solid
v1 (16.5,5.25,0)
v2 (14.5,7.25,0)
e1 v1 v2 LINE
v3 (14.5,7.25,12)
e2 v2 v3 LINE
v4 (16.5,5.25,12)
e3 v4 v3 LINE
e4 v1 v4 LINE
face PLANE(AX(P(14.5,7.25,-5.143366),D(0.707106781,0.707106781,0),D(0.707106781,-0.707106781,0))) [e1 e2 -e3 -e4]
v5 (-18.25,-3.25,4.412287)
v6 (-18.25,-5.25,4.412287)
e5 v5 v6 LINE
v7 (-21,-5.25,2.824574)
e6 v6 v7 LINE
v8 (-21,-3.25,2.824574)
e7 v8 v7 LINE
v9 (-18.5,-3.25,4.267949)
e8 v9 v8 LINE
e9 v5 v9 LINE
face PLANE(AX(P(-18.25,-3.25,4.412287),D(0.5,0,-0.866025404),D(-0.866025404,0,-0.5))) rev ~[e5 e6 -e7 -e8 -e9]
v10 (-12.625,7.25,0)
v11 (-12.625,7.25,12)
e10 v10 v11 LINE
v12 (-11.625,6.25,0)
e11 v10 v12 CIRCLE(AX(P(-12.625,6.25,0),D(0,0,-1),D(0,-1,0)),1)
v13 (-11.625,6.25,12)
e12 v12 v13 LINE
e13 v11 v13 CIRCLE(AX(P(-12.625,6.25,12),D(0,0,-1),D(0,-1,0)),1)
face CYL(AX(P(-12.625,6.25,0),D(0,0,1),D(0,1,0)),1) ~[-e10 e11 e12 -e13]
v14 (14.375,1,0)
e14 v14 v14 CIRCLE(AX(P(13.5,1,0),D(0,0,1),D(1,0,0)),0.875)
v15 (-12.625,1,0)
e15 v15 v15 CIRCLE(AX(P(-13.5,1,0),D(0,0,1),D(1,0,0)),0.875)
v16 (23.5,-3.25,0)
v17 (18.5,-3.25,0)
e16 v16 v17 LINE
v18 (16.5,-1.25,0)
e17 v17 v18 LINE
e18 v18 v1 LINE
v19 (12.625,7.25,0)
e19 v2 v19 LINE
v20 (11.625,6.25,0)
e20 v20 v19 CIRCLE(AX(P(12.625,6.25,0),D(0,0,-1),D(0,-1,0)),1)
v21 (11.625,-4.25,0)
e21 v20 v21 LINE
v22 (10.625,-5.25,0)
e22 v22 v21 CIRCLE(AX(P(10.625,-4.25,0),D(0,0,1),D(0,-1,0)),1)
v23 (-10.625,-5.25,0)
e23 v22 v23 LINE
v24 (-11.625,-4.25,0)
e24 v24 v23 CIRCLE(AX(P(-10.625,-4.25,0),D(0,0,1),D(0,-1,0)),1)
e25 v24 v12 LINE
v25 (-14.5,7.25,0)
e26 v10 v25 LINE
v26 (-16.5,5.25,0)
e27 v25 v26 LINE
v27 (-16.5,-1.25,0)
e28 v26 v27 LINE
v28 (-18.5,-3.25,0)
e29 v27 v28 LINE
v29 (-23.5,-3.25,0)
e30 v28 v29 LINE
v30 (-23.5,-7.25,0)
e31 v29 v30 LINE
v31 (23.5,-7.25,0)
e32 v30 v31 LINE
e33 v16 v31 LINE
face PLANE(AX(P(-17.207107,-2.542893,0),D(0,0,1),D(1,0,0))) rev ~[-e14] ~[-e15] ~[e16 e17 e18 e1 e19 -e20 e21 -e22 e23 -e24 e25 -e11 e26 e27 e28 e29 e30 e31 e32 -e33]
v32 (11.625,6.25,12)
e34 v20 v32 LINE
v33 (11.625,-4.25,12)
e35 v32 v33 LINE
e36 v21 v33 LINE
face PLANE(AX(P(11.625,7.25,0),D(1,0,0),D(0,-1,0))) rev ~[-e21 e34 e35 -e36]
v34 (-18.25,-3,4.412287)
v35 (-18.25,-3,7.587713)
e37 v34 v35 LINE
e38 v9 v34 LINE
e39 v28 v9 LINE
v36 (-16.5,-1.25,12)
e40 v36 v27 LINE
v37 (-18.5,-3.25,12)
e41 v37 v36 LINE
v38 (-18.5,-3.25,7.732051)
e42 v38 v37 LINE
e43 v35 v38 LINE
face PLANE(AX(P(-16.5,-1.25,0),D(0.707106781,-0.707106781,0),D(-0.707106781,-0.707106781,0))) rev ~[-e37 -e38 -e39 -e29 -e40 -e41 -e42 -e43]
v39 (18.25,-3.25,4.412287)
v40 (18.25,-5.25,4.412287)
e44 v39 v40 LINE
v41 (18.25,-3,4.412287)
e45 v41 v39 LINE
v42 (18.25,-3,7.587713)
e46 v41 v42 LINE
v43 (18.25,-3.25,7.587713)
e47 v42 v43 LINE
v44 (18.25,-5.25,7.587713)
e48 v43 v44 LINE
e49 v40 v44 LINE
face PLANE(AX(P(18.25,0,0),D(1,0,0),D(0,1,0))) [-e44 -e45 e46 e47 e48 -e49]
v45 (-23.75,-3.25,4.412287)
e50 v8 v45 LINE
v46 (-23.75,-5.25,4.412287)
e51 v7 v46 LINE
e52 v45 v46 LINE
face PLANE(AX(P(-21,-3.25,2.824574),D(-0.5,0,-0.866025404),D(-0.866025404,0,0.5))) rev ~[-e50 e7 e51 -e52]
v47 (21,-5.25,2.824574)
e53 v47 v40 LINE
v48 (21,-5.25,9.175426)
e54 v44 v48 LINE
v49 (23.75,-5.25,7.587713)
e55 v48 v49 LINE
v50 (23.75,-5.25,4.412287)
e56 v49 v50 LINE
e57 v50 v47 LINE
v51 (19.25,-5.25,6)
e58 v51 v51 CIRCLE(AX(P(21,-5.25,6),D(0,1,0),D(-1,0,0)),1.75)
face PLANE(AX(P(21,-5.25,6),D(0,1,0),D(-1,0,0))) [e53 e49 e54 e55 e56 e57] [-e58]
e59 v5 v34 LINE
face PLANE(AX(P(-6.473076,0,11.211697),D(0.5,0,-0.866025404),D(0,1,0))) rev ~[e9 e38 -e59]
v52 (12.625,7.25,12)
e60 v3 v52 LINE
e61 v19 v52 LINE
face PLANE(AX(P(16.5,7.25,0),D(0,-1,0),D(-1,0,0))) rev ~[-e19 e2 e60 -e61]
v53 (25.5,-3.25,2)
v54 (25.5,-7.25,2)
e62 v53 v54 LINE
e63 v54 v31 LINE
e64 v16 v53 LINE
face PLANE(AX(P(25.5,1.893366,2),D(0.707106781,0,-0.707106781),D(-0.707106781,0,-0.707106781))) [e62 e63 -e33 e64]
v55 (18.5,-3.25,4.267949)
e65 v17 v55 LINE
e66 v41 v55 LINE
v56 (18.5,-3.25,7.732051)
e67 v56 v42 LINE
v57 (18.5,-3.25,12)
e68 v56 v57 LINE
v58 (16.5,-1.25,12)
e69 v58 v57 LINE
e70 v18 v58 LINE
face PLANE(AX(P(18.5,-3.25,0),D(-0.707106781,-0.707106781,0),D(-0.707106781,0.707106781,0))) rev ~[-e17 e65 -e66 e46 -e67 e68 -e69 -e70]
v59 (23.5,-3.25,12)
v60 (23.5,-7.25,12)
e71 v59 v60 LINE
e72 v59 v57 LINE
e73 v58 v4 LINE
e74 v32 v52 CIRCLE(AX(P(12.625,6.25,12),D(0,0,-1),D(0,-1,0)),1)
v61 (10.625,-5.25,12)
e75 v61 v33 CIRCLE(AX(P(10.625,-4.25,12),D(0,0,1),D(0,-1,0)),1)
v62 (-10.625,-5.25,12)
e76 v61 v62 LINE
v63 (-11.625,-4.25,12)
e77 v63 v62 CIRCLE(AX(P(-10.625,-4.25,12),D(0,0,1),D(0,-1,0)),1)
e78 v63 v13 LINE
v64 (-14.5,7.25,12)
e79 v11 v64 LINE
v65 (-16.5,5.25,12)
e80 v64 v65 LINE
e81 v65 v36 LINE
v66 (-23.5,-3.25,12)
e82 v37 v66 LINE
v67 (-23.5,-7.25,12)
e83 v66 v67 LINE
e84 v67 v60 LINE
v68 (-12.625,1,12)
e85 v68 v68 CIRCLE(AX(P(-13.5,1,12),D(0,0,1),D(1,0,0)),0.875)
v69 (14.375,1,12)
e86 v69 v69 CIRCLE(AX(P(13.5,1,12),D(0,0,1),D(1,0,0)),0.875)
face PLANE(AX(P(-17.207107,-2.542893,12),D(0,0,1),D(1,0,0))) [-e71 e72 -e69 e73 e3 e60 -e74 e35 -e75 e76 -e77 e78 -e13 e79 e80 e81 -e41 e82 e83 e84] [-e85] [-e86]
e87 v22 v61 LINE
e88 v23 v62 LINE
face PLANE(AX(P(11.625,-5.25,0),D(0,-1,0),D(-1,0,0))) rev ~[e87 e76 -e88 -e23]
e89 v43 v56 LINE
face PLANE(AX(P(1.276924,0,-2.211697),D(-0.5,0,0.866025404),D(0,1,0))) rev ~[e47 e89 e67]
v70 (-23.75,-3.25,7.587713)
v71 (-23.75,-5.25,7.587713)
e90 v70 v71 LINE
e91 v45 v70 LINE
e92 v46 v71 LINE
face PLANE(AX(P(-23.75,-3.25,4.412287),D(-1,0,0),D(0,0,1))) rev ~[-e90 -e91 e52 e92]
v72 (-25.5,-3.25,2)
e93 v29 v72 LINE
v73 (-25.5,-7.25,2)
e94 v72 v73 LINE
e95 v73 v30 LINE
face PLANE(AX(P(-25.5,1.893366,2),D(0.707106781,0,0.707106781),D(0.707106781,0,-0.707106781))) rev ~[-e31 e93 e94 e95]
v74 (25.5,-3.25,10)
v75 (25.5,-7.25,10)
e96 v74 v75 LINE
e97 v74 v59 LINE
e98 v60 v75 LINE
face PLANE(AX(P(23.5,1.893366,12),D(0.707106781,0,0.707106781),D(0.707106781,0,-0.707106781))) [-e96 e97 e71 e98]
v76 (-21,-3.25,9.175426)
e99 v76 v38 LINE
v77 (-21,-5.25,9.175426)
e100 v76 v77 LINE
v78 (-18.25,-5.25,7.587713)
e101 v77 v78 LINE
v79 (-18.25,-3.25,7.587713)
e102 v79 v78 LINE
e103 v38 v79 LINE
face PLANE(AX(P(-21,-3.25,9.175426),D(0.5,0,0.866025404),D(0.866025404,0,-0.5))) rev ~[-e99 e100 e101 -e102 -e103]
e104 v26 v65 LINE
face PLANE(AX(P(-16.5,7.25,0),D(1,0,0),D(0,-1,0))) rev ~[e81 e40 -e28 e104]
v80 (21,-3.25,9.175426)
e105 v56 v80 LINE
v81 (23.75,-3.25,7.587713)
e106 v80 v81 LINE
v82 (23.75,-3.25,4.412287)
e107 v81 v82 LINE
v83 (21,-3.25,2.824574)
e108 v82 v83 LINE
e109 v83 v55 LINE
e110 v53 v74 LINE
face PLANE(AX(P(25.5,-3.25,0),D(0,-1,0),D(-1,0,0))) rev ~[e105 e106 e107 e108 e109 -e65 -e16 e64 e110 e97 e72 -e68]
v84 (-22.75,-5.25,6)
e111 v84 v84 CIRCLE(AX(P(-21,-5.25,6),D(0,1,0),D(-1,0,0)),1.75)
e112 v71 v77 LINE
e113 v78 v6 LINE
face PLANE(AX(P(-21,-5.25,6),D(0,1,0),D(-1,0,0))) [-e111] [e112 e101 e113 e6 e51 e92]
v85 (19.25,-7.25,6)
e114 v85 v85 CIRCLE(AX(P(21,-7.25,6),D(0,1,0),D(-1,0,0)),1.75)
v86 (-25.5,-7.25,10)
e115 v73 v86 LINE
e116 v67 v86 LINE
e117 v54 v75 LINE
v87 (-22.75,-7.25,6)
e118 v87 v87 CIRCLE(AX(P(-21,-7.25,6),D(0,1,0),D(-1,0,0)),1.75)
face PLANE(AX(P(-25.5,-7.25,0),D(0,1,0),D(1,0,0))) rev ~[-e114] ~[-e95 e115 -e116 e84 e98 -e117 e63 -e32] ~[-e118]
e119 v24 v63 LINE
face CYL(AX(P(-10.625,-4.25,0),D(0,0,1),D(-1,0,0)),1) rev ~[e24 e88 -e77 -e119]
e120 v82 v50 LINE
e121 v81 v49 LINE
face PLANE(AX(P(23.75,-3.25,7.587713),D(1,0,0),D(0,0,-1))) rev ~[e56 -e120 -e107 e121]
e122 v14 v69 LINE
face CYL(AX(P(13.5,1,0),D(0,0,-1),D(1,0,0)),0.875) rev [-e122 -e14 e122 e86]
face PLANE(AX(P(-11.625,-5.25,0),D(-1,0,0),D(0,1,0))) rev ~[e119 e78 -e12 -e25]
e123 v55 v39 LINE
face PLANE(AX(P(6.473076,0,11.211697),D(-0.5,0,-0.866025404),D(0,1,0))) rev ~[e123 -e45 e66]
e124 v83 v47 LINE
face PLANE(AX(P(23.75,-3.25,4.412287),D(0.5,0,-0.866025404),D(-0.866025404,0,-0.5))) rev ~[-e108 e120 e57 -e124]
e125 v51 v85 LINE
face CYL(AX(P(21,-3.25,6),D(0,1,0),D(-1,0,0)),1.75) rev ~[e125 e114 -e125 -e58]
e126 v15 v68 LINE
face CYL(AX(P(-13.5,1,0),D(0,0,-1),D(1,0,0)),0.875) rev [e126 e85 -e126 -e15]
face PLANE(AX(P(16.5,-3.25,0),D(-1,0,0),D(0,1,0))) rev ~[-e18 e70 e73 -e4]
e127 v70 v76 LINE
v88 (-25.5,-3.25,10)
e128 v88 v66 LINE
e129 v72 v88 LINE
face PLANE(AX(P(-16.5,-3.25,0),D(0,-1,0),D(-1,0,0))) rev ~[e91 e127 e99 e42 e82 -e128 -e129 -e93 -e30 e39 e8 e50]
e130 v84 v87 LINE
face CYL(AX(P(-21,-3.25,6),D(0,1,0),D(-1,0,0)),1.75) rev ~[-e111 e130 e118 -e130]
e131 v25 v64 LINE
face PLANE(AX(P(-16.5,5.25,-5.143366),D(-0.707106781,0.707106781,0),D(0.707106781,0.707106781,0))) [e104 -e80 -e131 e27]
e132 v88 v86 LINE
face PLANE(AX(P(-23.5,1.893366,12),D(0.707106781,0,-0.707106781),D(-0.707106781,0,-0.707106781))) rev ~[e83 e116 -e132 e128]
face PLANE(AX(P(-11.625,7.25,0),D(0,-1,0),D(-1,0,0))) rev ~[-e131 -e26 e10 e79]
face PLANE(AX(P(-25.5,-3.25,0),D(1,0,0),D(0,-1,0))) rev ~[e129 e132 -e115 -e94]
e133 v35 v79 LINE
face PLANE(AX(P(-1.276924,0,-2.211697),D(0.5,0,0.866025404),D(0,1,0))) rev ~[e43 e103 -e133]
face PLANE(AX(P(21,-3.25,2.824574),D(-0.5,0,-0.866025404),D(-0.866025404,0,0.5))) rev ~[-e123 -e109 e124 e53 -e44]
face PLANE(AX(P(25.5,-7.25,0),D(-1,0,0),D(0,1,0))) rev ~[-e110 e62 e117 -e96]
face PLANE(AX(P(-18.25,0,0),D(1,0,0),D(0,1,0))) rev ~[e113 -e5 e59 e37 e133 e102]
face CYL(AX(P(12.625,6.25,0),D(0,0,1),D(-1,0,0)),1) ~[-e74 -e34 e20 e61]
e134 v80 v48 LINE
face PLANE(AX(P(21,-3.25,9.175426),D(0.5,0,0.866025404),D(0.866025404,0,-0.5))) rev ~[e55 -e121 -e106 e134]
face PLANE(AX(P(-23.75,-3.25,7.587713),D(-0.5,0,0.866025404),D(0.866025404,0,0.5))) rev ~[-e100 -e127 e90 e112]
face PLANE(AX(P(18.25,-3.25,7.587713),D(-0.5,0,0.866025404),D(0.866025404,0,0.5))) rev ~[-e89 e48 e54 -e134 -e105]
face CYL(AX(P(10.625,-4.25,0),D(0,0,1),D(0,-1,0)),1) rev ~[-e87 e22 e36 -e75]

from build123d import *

# Parameters (mm, degrees)
F0_R         = 0.875
F1_DEPTH     = 12
F2_R         = 1.75
F3_DEPTH     = 4.001
F4_DEPTH     = 2
F5_T4_DEPTH  = 12
F5_T10_DEPTH = 12
F5_T16_DEPTH = 12
F5_T23_DEPTH = 12
F5_T29_DEPTH = 12
F5_T35_DEPTH = 12
F5_T41_DEPTH = 12
F5_T47_DEPTH = 12
F5_T54_DEPTH = 12
F5_T60_DEPTH = 12
F5_T63_DEPTH = 14.2867319519
F5_T65_DEPTH = 22.2867319519
F6_R         = 1


# Not quite as in the source:
# - a fillet or chamfer that OpenCascade refuses, or shapes differently, is made with other operations: its cross-section is extruded or revolved along the edge and cut away or added


with BuildPart() as f1:
    # F0 (on Top) → F1 (new body)
    with BuildSketch(Plane.XY):
        Polygon((16.5, -5.25), (11.625, -5.25), (-11.625, -5.25), (-16.5, -5.25), (-16.5, -7.25), (16.5, -7.25), align=None)
        Polygon((-11.625, -5.25), (-11.625, 7.25), (-16.5, 7.25), (-16.5, -3.25), (-16.5, -5.25), align=None)
        with Locations((-13.5, 1)):
            Circle(F0_R, mode=Mode.SUBTRACT)
        Polygon((16.5, -3.25), (16.5, 7.25), (11.625, 7.25), (11.625, -5.25), (16.5, -5.25), align=None)
        with Locations((13.5, 1)):
            Circle(F0_R, mode=Mode.SUBTRACT)
        Polygon((25.5, -3.25), (16.5, -3.25), (16.5, -5.25), (16.5, -7.25), (25.5, -7.25), align=None)
        Polygon((-16.5, -5.25), (-16.5, -3.25), (-25.5, -3.25), (-25.5, -7.25), (-16.5, -7.25), align=None)
    extrude(amount=F1_DEPTH)

    # F2 (on face) → F3 (cut, through all)
    with BuildSketch(Plane(origin=(0, -3.25, 0), x_dir=(-1, 0, 0), z_dir=(0, 1, 0))):
        with Locations((-21, 6)):
            Circle(F2_R)
        with Locations((21, 6)):
            Circle(F2_R)
    extrude(amount=-F3_DEPTH, mode=Mode.SUBTRACT)

    # F2 (on face) → F4 (cut)
    with BuildSketch(Plane(origin=(0, -3.25, 0), x_dir=(-1, 0, 0), z_dir=(0, 1, 0))):
        Polygon((-18.25, 4.4122867597), (-18.25, 7.5877132403), (-21, 9.1754264805), (-23.75, 7.5877132403), (-23.75, 4.4122867597), (-21, 2.8245735195), align=None)
        with Locations((-21, 6)):
            Circle(F2_R, mode=Mode.SUBTRACT)
        Polygon((21, 9.1754264805), (18.25, 7.5877132403), (18.25, 4.4122867597), (21, 2.8245735195), (23.75, 4.4122867597), (23.75, 7.5877132403), align=None)
        with Locations((21, 6)):
            Circle(F2_R, mode=Mode.SUBTRACT)
    extrude(amount=-F4_DEPTH, mode=Mode.SUBTRACT)

    # F5: chamfer of 2 on 8 edges, made by hand


with BuildPart() as f5_tool2:
    # F5_s3 → F5_t4 (new body)
    with BuildSketch(Plane.XY):
        Polygon((18.5, -3.25), (16.5, -1.25), (16.5, -3.25), align=None)
    extrude(amount=F5_T4_DEPTH)

    split(bisect_by=Plane.YZ.offset(18.25), keep=Keep.TOP)

    split(bisect_by=Plane(origin=(6.4730762114, 0, 11.2116968793), x_dir=(0, 1, 0), z_dir=(-0.5, 0, -0.8660254038)), keep=Keep.TOP)


with BuildPart() as f1_1:
    add(f1.part)

    # F5_t1: union F5_tool2
    add(f5_tool2.part)


with BuildPart() as f5_tool8:
    # F5_s9 → F5_t10 (new body)
    with BuildSketch(Plane.XY):
        Polygon((18.5, -3.25), (16.5, -1.25), (16.5, -3.25), align=None)
    extrude(amount=F5_T10_DEPTH)

    split(bisect_by=Plane.YZ.offset(18.25), keep=Keep.BOTTOM)

    split(bisect_by=Plane(origin=(6.4730762114, 0, 11.2116968793), x_dir=(0, 1, 0), z_dir=(-0.5, 0, -0.8660254038)), keep=Keep.TOP)


with BuildPart() as f1_2:
    add(f1_1.part)

    # F5_t7: union F5_tool8
    add(f5_tool8.part)


with BuildPart() as f5_tool14:
    # F5_s15 → F5_t16 (new body)
    with BuildSketch(Plane.XY):
        Polygon((18.5, -3.25), (16.5, -1.25), (16.5, -3.25), align=None)
    extrude(amount=F5_T16_DEPTH)

    split(bisect_by=Plane(origin=(1.2769237886, 0, -2.2116968793), x_dir=(0, 1, 0), z_dir=(0.5, 0, -0.8660254038)), keep=Keep.TOP)

    split(bisect_by=Plane.YZ.offset(18.25), keep=Keep.BOTTOM)

    split(bisect_by=Plane(origin=(6.4730762114, 0, 11.2116968793), x_dir=(0, 1, 0), z_dir=(0.5, 0, 0.8660254038)), keep=Keep.TOP)


with BuildPart() as f1_3:
    add(f1_2.part)

    # F5_t13: union F5_tool14
    add(f5_tool14.part)


with BuildPart() as f5_tool21:
    # F5_s22 → F5_t23 (new body)
    with BuildSketch(Plane.XY):
        Polygon((18.5, -3.25), (16.5, -1.25), (16.5, -3.25), align=None)
    extrude(amount=F5_T23_DEPTH)

    split(bisect_by=Plane(origin=(1.2769237886, 0, -2.2116968793), x_dir=(0, 1, 0), z_dir=(-0.5, 0, 0.8660254038)), keep=Keep.TOP)

    split(bisect_by=Plane.YZ.offset(18.25), keep=Keep.TOP)


with BuildPart() as f1_4:
    add(f1_3.part)

    # F5_t20: union F5_tool21
    add(f5_tool21.part)


with BuildPart() as f5_tool27:
    # F5_s28 → F5_t29 (new body)
    with BuildSketch(Plane.XY):
        Polygon((18.5, -3.25), (16.5, -1.25), (16.5, -3.25), align=None)
    extrude(amount=F5_T29_DEPTH)

    split(bisect_by=Plane(origin=(1.2769237886, 0, -2.2116968793), x_dir=(0, 1, 0), z_dir=(-0.5, 0, 0.8660254038)), keep=Keep.TOP)

    split(bisect_by=Plane.YZ.offset(18.25), keep=Keep.BOTTOM)


with BuildPart() as f1_5:
    add(f1_4.part)

    # F5_t26: union F5_tool27
    add(f5_tool27.part)


with BuildPart() as f5_tool33:
    # F5_s34 → F5_t35 (new body)
    with BuildSketch(Plane.XY):
        Polygon((-16.5, -1.25), (-18.5, -3.25), (-16.5, -3.25), align=None)
    extrude(amount=F5_T35_DEPTH)

    split(bisect_by=Plane(origin=(-6.4730762114, 0, 11.2116968793), x_dir=(0, 1, 0), z_dir=(0.5, 0, -0.8660254038)), keep=Keep.TOP)

    split(bisect_by=Plane.YZ.offset(-18.25), keep=Keep.TOP)


with BuildPart() as f1_6:
    add(f1_5.part)

    # F5_t32: union F5_tool33
    add(f5_tool33.part)


with BuildPart() as f5_tool39:
    # F5_s40 → F5_t41 (new body)
    with BuildSketch(Plane.XY):
        Polygon((-16.5, -1.25), (-18.5, -3.25), (-16.5, -3.25), align=None)
    extrude(amount=F5_T41_DEPTH)

    split(bisect_by=Plane(origin=(-6.4730762114, 0, 11.2116968793), x_dir=(0, 1, 0), z_dir=(0.5, 0, -0.8660254038)), keep=Keep.TOP)

    split(bisect_by=Plane.YZ.offset(-18.25), keep=Keep.BOTTOM)


with BuildPart() as f1_7:
    add(f1_6.part)

    # F5_t38: union F5_tool39
    add(f5_tool39.part)


with BuildPart() as f5_tool45:
    # F5_s46 → F5_t47 (new body)
    with BuildSketch(Plane.XY):
        Polygon((-16.5, -1.25), (-18.5, -3.25), (-16.5, -3.25), align=None)
    extrude(amount=F5_T47_DEPTH)

    split(bisect_by=Plane(origin=(-6.4730762114, 0, 11.2116968793), x_dir=(0, 1, 0), z_dir=(-0.5, 0, 0.8660254038)), keep=Keep.TOP)

    split(bisect_by=Plane.YZ.offset(-18.25), keep=Keep.TOP)

    split(bisect_by=Plane(origin=(-1.2769237886, 0, -2.2116968793), x_dir=(0, 1, 0), z_dir=(-0.5, 0, -0.8660254038)), keep=Keep.TOP)


with BuildPart() as f1_8:
    add(f1_7.part)

    # F5_t44: union F5_tool45
    add(f5_tool45.part)


with BuildPart() as f5_tool52:
    # F5_s53 → F5_t54 (new body)
    with BuildSketch(Plane.XY):
        Polygon((-16.5, -1.25), (-18.5, -3.25), (-16.5, -3.25), align=None)
    extrude(amount=F5_T54_DEPTH)

    split(bisect_by=Plane.YZ.offset(-18.25), keep=Keep.TOP)

    split(bisect_by=Plane(origin=(-1.2769237886, 0, -2.2116968793), x_dir=(0, 1, 0), z_dir=(0.5, 0, 0.8660254038)), keep=Keep.TOP)


with BuildPart() as f1_9:
    add(f1_8.part)

    # F5_t51: union F5_tool52
    add(f5_tool52.part)


with BuildPart() as f5_tool58:
    # F5_s59 → F5_t60 (new body)
    with BuildSketch(Plane.XY):
        Polygon((-16.5, -1.25), (-18.5, -3.25), (-16.5, -3.25), align=None)
    extrude(amount=F5_T60_DEPTH)

    split(bisect_by=Plane.YZ.offset(-18.25), keep=Keep.BOTTOM)

    split(bisect_by=Plane(origin=(-1.2769237886, 0, -2.2116968793), x_dir=(0, 1, 0), z_dir=(0.5, 0, 0.8660254038)), keep=Keep.TOP)


with BuildPart() as f1_10:
    add(f1_9.part)

    # F5_t57: union F5_tool58
    add(f5_tool58.part)

    # F5_s64 → F5_t63 (cut)
    with BuildSketch(Plane.XZ.offset(-1.8933659759)):
        Polygon((25.5, 2), (23.5, 0), (25.5, 0), align=None)
        Polygon((23.5, 12), (25.5, 10), (25.5, 12), align=None)
        Polygon((-25.5, 2), (-23.5, 0), (-25.5, 0), align=None)
        Polygon((-23.5, 12), (-25.5, 10), (-25.5, 12), align=None)
    extrude(amount=F5_T63_DEPTH, mode=Mode.SUBTRACT)

    # F5_s66 → F5_t65 (cut)
    with BuildSketch(Plane.XY.offset(-5.1433659759)):
        Polygon((14.5, 7.25), (16.5, 5.25), (16.5, 7.25), align=None)
        Polygon((-16.5, 5.25), (-14.5, 7.25), (-16.5, 7.25), align=None)
    extrude(amount=F5_T65_DEPTH, mode=Mode.SUBTRACT)

    # F6
    f6_edges = [f1_10.edges().sort_by_distance(p)[0] for p in [
        (-11.625, 7.25, 6),
        (11.625, 7.25, 6),
        (11.625, -5.25, 6),
        (-11.625, -5.25, 6),
    ]]
    fillet(f6_edges, radius=F6_R)


solid = f1_10.part
